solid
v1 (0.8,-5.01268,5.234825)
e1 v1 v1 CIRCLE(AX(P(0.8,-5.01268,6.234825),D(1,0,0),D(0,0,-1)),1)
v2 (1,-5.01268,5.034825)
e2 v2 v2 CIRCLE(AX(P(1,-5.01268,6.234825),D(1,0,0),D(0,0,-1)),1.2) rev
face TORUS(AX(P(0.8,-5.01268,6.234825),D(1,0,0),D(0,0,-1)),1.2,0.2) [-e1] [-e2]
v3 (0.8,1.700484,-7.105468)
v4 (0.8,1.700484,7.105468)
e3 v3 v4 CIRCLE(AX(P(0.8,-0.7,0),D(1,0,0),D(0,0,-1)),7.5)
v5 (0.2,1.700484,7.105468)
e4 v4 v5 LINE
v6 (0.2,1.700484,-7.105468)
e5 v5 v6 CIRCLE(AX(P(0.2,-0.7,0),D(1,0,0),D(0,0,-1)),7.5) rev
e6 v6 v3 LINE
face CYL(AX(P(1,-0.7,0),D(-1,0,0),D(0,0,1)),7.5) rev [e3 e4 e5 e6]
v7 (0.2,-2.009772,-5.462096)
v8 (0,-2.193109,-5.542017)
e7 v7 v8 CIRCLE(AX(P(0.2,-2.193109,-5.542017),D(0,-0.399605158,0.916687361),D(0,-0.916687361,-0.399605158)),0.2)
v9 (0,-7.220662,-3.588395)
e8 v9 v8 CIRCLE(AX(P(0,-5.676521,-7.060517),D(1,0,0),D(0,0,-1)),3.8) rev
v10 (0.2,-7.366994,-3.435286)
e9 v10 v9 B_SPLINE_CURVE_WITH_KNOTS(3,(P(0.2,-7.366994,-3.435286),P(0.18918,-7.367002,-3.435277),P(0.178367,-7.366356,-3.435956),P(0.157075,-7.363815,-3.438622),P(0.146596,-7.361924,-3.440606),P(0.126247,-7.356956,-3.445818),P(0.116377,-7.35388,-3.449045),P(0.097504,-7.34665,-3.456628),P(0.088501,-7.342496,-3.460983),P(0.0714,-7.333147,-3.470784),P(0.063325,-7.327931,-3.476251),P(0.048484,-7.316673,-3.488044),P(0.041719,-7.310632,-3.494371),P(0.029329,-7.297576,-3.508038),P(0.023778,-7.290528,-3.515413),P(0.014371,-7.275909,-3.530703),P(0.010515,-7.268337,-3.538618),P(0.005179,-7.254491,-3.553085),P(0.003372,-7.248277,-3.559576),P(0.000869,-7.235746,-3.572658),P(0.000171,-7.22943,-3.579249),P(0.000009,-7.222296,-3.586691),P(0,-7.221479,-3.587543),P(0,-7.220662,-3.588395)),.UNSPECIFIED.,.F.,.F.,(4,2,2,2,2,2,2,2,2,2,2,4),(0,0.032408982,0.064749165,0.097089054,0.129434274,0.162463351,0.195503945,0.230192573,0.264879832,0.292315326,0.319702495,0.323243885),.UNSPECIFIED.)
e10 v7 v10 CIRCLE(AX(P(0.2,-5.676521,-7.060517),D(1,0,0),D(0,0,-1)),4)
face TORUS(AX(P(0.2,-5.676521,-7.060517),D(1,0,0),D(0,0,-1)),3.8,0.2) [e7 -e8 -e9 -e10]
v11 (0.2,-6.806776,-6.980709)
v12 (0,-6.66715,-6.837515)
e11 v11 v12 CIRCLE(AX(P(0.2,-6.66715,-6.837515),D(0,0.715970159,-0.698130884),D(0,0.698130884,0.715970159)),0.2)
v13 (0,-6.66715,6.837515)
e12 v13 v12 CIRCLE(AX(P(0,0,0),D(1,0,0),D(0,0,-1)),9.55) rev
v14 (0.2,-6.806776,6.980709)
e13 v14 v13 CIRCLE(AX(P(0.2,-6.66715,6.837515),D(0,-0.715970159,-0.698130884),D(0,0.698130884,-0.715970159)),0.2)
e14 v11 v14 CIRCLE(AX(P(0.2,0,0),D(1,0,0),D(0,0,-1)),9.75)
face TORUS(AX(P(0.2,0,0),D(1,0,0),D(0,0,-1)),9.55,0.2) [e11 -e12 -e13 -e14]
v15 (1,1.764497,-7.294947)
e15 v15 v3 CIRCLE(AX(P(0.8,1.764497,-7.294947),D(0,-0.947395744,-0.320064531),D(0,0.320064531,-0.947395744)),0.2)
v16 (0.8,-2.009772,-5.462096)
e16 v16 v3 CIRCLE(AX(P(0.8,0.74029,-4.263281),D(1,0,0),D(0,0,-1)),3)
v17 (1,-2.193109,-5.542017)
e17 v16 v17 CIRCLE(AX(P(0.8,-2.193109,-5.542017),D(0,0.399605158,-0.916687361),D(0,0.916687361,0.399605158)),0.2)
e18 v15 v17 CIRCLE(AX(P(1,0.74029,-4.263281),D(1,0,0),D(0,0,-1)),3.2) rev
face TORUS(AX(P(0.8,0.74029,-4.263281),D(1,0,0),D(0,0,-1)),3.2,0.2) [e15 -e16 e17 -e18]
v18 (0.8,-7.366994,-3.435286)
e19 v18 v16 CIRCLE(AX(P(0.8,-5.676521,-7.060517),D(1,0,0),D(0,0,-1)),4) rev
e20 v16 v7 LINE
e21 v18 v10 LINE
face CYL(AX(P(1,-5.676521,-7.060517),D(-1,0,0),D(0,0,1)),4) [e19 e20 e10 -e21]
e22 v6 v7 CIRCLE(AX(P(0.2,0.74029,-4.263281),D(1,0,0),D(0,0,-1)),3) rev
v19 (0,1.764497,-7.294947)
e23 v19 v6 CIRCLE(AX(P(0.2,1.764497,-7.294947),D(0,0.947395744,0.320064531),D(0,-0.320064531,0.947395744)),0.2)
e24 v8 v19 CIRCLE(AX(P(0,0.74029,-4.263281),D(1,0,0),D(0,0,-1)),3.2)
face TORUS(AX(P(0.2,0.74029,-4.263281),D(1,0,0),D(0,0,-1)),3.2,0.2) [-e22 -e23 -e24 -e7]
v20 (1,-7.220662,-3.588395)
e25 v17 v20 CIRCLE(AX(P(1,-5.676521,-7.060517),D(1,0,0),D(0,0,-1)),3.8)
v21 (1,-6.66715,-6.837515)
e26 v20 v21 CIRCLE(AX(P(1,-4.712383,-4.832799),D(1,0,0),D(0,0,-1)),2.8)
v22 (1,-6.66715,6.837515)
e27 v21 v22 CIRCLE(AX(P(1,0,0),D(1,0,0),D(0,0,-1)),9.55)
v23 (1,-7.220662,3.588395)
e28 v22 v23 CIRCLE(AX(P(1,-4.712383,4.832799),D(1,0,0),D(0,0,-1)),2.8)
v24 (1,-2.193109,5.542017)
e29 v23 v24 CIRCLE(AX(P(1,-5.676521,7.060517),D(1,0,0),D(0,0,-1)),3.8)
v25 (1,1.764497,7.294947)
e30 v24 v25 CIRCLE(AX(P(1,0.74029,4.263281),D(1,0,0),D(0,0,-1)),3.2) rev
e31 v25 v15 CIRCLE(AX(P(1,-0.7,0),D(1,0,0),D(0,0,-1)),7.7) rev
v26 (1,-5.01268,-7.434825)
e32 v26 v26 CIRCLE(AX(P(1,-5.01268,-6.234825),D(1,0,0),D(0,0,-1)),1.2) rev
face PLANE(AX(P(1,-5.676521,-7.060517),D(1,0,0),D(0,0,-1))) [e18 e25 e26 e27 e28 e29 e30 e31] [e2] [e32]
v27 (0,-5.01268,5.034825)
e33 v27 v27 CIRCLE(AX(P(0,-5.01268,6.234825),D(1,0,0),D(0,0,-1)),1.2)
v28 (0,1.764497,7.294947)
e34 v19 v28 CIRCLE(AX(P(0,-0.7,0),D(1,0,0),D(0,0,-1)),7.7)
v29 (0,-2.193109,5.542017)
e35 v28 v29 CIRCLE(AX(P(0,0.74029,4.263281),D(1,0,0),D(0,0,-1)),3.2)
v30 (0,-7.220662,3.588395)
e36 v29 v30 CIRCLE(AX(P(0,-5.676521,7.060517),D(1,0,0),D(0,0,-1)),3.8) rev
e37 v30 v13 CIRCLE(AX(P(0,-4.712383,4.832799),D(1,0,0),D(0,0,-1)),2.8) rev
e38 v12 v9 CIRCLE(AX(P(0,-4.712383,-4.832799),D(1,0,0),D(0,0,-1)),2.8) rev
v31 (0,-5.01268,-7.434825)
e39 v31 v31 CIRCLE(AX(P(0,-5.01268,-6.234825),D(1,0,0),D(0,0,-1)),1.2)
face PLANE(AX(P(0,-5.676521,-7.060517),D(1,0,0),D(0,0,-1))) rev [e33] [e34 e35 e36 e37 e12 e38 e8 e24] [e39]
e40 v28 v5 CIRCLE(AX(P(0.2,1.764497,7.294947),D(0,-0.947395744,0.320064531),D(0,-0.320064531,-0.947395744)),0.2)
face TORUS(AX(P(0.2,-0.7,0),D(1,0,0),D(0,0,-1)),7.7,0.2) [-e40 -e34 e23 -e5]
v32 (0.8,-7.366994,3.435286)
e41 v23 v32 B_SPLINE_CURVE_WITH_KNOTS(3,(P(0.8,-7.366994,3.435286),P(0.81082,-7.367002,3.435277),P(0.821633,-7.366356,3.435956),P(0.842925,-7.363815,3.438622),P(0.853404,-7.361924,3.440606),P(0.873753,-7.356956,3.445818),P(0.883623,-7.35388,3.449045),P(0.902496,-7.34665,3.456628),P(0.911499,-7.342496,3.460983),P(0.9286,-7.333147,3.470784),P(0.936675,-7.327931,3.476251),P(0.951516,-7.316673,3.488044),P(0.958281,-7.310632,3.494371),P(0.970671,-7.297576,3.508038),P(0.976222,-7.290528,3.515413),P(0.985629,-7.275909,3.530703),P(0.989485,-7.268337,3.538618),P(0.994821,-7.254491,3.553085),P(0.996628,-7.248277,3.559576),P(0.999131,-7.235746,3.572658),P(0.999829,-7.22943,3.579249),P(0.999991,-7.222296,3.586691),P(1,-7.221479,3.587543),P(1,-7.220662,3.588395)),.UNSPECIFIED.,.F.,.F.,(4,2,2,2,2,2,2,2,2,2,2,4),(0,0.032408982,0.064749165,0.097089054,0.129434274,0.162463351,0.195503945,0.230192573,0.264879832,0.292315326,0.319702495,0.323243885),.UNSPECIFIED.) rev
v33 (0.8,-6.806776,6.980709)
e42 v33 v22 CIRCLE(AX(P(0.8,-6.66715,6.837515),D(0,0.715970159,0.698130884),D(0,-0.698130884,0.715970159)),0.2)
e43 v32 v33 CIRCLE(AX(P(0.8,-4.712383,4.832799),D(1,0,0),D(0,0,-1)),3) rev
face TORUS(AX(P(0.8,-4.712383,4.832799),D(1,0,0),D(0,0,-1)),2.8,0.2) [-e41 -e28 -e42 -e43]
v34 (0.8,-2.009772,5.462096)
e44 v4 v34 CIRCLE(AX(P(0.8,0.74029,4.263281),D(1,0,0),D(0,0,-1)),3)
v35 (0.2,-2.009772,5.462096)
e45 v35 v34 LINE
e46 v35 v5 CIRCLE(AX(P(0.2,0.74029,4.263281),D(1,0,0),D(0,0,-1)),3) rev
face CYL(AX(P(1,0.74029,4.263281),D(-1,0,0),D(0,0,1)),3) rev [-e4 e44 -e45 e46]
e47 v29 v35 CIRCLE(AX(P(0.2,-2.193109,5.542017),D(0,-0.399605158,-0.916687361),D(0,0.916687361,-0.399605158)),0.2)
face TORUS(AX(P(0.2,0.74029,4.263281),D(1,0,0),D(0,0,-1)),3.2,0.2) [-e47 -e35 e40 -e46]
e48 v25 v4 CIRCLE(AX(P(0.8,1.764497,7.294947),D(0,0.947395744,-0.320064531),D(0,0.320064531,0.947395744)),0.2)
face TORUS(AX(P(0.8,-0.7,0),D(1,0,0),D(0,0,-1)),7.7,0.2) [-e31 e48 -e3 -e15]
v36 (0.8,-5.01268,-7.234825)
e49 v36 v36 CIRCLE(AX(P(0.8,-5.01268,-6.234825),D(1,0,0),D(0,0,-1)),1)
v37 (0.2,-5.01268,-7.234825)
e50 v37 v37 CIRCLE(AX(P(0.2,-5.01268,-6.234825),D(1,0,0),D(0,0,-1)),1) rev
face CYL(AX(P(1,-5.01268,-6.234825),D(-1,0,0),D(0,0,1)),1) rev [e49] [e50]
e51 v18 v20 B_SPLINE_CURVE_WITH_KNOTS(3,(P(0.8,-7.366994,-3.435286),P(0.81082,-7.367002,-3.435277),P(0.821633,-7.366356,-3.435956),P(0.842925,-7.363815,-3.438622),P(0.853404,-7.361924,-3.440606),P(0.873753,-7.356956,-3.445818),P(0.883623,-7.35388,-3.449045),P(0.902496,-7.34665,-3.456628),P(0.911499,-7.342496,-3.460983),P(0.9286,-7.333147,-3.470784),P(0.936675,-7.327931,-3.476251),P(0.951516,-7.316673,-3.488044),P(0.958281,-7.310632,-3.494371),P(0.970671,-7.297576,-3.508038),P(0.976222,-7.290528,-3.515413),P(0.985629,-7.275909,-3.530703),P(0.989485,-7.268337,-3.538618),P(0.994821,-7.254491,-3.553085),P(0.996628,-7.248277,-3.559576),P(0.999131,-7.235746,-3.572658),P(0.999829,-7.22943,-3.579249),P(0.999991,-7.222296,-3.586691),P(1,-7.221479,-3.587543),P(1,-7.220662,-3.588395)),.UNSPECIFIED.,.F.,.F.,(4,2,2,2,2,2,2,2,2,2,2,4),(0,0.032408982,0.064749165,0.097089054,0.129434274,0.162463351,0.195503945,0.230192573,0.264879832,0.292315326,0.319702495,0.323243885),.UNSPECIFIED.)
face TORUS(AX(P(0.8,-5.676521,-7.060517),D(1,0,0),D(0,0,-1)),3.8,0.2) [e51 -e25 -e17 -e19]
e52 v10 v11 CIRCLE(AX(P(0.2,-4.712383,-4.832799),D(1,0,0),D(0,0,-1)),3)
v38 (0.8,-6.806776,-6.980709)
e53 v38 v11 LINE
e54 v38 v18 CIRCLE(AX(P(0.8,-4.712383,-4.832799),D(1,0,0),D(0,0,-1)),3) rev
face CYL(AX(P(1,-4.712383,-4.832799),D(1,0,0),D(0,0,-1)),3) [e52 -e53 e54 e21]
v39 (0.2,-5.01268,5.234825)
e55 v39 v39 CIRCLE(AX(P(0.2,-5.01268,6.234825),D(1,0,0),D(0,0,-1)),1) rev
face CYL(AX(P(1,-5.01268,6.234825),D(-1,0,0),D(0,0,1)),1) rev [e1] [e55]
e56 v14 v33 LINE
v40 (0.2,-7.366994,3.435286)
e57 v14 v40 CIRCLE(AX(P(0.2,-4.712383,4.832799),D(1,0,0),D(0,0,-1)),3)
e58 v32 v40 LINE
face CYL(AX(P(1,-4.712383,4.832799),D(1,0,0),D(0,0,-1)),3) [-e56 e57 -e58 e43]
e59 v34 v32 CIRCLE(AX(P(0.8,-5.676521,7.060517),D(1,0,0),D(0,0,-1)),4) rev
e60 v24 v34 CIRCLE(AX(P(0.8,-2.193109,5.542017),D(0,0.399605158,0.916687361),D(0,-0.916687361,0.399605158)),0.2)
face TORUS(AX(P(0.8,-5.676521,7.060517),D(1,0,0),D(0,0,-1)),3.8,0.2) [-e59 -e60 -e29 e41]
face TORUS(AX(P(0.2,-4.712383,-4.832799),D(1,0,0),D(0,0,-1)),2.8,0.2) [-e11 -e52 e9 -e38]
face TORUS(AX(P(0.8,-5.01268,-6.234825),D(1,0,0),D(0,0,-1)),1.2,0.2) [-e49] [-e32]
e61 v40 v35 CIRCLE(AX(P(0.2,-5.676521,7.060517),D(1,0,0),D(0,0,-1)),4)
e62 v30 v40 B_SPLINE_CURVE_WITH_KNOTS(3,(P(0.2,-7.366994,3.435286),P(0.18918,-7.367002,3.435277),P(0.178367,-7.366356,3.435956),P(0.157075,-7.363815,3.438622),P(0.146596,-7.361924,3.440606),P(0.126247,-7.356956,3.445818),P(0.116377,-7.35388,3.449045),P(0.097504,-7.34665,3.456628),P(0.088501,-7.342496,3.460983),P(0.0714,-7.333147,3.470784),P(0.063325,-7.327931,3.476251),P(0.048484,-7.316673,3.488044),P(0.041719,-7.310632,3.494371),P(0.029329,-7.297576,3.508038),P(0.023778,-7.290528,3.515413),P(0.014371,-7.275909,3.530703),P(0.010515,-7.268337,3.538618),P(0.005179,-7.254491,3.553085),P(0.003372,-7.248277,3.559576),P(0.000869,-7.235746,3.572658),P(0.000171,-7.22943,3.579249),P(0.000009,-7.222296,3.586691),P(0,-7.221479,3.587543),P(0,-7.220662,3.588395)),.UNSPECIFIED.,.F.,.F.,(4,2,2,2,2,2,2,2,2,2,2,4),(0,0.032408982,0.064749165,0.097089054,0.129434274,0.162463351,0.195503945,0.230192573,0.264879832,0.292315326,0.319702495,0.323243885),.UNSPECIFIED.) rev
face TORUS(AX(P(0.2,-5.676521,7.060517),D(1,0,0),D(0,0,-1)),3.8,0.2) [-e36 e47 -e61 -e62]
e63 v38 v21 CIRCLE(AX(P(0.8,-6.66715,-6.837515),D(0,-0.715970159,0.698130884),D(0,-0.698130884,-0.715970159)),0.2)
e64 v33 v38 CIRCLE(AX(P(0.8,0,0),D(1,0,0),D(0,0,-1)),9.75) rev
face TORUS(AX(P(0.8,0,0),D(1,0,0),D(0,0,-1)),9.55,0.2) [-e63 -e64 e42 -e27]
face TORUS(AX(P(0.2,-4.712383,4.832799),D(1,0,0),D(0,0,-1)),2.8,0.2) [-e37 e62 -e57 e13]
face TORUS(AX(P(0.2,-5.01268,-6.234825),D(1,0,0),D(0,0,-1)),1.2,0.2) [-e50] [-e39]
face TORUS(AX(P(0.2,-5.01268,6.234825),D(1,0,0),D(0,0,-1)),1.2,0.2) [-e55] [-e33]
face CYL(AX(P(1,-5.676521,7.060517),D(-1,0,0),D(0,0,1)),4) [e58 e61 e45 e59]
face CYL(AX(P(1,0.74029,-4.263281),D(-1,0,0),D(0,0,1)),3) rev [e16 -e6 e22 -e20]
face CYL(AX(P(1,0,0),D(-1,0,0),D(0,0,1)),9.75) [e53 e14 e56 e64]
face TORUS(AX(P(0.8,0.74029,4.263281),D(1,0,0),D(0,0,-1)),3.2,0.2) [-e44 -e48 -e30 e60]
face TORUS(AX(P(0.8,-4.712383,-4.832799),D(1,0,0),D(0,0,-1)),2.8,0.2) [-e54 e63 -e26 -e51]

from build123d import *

# Parameters (mm, degrees)
SKETCH_1_R      = 1
EXTRUDE_1_DEPTH = 1
FILLET_1_R      = 3
FILLET_2_R      = 0.2


with BuildPart() as part:
    # 草图1 → 凸台-拉伸1 (new body)
    with BuildSketch(Plane(origin=(0, 0, 0), x_dir=(0, 0, -1), z_dir=(1, 0, 0))):
        with BuildLine():
            Line((3.435285805, -7.366994183), (4.120528052, -8.836500924))
            ThreePointArc((4.120528052, -8.836500924), (0, 9.75), (-4.120528052, -8.836500924))
            Line((-4.120528052, -8.836500924), (-3.435285805, -7.366994183))
            ThreePointArc((-3.435285805, -7.366994183), (-3.791037727, -3.372067711), (-7.433841702, -1.693980661))
            ThreePointArc((-7.433841702, -1.693980661), (0, 6.8), (7.433841702, -1.693980661))
            ThreePointArc((7.433841702, -1.693980661), (3.791037727, -3.372067711), (3.435285805, -7.366994183))
        make_face()
        with Locations((6.234824566, -5.012680185)):
            Circle(SKETCH_1_R, mode=Mode.SUBTRACT)
        with Locations(Location((-6.234824566, -5.012680185, 0), (0, 0, 180))):
            Circle(SKETCH_1_R, mode=Mode.SUBTRACT)
    extrude(amount=EXTRUDE_1_DEPTH)

    # 圆角1
    # the kernel refuses this fillet: 3 mm, written as the material it adds along each edge
    with BuildSketch(Plane(origin=(0, -1.693980661, 7.433841702), x_dir=(0, -0.15814273112470859, -0.9874162630787575), z_dir=(1, 0, 0))) as fillet_1_piece_1:
        with BuildLine():
            CenterArc((2.745701077, 2.905039978), FILLET_1_R, 170.432282597, 85.113330195)
            ThreePointArc((-0.212568456, 3.403679497), (-0.302311067, 1.689597373), (0, 0))
            ThreePointArc((0, 0), (0.998436755, 0.126613362), (1.996873511, 0))
        make_face()
    extrude(amount=1)
    with BuildSketch(Plane(origin=(0, -1.693980661, -7.433841702), x_dir=(0, -0.15814273112470806, 0.9874162630787576), z_dir=(1, 0, 0))) as fillet_1_piece_2:
        with BuildLine():
            CenterArc((2.745701077, -2.905039978), FILLET_1_R, 104.454387208, 85.113330195)
            ThreePointArc((-0.212568456, -3.403679497), (-0.302311067, -1.689597373), (0, 0))
            ThreePointArc((0, 0), (0.998436755, -0.126613362), (1.996873511, 0))
        make_face()
    extrude(amount=1)
    # the kernel refuses this fillet: 3 mm, written as the material it takes off along each edge
    with BuildSketch(Plane(origin=(-8.767987991, -8.836500924, -4.120528052), x_dir=(0, 0.906307787036703, 0.42261826174058587), z_dir=(1, 0, 0))) as fillet_1_2_piece_1:
        with BuildLine():
            CenterArc((3.436701236, -2.388463673), FILLET_1_R, 127.23555709, 73.48720666)
            ThreePointArc((0.630790674, -3.450003083), (0.158994033, -1.753597598), (0, 0))
            Line((0, 0), (1.621421289, 0))
        make_face()
    extrude(amount=18.535975981, mode=Mode.SUBTRACT)
    with BuildSketch(Plane(origin=(-8.767987991, -8.836500924, 4.120528052), x_dir=(0, 0.578731633717964, 0.8155180538370297), z_dir=(1, 0, 0))) as fillet_1_2_piece_2:
        with BuildLine():
            CenterArc((2.967626705, -2.951078759), FILLET_1_R, 79.638618125, 73.48720666)
            Line((0.291622613, -1.594980642), (0, 0))
            ThreePointArc((0, 0), (1.753597598, 0.158994033), (3.507195196, 0))
        make_face()
    extrude(amount=18.535975981, mode=Mode.SUBTRACT)

    # 圆角2
    fillet_2_edges = [part.edges().sort_by_distance(p)[0] for p in [
        (0, -5.012680185, -5.234824566),
        (1, -5.012680185, -5.234824566),
        (0, -5.012680185, 5.234824566),
        (1, -4.261103418, 3.319314916),
        (1, -5.012680185, 5.234824566),
        (0, 9.75, 0),
        (1, 9.75, 0),
        (0, -4.261103418, -3.319314916),
        (0, 6.8, 0),
        (0, -7.675618987, 5.301024215),
        (0, -7.675618987, -5.301024215),
        (1, -4.261103418, -3.319314916),
        (1, 6.8, 0),
        (1, -7.675618987, 5.301024215),
        (1, -7.675618987, -5.301024215),
        (0, -0.474647874, 7.006258248),
        (1, -0.474647874, 7.006258248),
        (0, -0.474647874, -7.006258248),
        (1, -0.474647874, -7.006258248),
        (0, -4.261103418, 3.319314916),
    ]]
    fillet(fillet_2_edges, radius=FILLET_2_R)


solid = part.part
